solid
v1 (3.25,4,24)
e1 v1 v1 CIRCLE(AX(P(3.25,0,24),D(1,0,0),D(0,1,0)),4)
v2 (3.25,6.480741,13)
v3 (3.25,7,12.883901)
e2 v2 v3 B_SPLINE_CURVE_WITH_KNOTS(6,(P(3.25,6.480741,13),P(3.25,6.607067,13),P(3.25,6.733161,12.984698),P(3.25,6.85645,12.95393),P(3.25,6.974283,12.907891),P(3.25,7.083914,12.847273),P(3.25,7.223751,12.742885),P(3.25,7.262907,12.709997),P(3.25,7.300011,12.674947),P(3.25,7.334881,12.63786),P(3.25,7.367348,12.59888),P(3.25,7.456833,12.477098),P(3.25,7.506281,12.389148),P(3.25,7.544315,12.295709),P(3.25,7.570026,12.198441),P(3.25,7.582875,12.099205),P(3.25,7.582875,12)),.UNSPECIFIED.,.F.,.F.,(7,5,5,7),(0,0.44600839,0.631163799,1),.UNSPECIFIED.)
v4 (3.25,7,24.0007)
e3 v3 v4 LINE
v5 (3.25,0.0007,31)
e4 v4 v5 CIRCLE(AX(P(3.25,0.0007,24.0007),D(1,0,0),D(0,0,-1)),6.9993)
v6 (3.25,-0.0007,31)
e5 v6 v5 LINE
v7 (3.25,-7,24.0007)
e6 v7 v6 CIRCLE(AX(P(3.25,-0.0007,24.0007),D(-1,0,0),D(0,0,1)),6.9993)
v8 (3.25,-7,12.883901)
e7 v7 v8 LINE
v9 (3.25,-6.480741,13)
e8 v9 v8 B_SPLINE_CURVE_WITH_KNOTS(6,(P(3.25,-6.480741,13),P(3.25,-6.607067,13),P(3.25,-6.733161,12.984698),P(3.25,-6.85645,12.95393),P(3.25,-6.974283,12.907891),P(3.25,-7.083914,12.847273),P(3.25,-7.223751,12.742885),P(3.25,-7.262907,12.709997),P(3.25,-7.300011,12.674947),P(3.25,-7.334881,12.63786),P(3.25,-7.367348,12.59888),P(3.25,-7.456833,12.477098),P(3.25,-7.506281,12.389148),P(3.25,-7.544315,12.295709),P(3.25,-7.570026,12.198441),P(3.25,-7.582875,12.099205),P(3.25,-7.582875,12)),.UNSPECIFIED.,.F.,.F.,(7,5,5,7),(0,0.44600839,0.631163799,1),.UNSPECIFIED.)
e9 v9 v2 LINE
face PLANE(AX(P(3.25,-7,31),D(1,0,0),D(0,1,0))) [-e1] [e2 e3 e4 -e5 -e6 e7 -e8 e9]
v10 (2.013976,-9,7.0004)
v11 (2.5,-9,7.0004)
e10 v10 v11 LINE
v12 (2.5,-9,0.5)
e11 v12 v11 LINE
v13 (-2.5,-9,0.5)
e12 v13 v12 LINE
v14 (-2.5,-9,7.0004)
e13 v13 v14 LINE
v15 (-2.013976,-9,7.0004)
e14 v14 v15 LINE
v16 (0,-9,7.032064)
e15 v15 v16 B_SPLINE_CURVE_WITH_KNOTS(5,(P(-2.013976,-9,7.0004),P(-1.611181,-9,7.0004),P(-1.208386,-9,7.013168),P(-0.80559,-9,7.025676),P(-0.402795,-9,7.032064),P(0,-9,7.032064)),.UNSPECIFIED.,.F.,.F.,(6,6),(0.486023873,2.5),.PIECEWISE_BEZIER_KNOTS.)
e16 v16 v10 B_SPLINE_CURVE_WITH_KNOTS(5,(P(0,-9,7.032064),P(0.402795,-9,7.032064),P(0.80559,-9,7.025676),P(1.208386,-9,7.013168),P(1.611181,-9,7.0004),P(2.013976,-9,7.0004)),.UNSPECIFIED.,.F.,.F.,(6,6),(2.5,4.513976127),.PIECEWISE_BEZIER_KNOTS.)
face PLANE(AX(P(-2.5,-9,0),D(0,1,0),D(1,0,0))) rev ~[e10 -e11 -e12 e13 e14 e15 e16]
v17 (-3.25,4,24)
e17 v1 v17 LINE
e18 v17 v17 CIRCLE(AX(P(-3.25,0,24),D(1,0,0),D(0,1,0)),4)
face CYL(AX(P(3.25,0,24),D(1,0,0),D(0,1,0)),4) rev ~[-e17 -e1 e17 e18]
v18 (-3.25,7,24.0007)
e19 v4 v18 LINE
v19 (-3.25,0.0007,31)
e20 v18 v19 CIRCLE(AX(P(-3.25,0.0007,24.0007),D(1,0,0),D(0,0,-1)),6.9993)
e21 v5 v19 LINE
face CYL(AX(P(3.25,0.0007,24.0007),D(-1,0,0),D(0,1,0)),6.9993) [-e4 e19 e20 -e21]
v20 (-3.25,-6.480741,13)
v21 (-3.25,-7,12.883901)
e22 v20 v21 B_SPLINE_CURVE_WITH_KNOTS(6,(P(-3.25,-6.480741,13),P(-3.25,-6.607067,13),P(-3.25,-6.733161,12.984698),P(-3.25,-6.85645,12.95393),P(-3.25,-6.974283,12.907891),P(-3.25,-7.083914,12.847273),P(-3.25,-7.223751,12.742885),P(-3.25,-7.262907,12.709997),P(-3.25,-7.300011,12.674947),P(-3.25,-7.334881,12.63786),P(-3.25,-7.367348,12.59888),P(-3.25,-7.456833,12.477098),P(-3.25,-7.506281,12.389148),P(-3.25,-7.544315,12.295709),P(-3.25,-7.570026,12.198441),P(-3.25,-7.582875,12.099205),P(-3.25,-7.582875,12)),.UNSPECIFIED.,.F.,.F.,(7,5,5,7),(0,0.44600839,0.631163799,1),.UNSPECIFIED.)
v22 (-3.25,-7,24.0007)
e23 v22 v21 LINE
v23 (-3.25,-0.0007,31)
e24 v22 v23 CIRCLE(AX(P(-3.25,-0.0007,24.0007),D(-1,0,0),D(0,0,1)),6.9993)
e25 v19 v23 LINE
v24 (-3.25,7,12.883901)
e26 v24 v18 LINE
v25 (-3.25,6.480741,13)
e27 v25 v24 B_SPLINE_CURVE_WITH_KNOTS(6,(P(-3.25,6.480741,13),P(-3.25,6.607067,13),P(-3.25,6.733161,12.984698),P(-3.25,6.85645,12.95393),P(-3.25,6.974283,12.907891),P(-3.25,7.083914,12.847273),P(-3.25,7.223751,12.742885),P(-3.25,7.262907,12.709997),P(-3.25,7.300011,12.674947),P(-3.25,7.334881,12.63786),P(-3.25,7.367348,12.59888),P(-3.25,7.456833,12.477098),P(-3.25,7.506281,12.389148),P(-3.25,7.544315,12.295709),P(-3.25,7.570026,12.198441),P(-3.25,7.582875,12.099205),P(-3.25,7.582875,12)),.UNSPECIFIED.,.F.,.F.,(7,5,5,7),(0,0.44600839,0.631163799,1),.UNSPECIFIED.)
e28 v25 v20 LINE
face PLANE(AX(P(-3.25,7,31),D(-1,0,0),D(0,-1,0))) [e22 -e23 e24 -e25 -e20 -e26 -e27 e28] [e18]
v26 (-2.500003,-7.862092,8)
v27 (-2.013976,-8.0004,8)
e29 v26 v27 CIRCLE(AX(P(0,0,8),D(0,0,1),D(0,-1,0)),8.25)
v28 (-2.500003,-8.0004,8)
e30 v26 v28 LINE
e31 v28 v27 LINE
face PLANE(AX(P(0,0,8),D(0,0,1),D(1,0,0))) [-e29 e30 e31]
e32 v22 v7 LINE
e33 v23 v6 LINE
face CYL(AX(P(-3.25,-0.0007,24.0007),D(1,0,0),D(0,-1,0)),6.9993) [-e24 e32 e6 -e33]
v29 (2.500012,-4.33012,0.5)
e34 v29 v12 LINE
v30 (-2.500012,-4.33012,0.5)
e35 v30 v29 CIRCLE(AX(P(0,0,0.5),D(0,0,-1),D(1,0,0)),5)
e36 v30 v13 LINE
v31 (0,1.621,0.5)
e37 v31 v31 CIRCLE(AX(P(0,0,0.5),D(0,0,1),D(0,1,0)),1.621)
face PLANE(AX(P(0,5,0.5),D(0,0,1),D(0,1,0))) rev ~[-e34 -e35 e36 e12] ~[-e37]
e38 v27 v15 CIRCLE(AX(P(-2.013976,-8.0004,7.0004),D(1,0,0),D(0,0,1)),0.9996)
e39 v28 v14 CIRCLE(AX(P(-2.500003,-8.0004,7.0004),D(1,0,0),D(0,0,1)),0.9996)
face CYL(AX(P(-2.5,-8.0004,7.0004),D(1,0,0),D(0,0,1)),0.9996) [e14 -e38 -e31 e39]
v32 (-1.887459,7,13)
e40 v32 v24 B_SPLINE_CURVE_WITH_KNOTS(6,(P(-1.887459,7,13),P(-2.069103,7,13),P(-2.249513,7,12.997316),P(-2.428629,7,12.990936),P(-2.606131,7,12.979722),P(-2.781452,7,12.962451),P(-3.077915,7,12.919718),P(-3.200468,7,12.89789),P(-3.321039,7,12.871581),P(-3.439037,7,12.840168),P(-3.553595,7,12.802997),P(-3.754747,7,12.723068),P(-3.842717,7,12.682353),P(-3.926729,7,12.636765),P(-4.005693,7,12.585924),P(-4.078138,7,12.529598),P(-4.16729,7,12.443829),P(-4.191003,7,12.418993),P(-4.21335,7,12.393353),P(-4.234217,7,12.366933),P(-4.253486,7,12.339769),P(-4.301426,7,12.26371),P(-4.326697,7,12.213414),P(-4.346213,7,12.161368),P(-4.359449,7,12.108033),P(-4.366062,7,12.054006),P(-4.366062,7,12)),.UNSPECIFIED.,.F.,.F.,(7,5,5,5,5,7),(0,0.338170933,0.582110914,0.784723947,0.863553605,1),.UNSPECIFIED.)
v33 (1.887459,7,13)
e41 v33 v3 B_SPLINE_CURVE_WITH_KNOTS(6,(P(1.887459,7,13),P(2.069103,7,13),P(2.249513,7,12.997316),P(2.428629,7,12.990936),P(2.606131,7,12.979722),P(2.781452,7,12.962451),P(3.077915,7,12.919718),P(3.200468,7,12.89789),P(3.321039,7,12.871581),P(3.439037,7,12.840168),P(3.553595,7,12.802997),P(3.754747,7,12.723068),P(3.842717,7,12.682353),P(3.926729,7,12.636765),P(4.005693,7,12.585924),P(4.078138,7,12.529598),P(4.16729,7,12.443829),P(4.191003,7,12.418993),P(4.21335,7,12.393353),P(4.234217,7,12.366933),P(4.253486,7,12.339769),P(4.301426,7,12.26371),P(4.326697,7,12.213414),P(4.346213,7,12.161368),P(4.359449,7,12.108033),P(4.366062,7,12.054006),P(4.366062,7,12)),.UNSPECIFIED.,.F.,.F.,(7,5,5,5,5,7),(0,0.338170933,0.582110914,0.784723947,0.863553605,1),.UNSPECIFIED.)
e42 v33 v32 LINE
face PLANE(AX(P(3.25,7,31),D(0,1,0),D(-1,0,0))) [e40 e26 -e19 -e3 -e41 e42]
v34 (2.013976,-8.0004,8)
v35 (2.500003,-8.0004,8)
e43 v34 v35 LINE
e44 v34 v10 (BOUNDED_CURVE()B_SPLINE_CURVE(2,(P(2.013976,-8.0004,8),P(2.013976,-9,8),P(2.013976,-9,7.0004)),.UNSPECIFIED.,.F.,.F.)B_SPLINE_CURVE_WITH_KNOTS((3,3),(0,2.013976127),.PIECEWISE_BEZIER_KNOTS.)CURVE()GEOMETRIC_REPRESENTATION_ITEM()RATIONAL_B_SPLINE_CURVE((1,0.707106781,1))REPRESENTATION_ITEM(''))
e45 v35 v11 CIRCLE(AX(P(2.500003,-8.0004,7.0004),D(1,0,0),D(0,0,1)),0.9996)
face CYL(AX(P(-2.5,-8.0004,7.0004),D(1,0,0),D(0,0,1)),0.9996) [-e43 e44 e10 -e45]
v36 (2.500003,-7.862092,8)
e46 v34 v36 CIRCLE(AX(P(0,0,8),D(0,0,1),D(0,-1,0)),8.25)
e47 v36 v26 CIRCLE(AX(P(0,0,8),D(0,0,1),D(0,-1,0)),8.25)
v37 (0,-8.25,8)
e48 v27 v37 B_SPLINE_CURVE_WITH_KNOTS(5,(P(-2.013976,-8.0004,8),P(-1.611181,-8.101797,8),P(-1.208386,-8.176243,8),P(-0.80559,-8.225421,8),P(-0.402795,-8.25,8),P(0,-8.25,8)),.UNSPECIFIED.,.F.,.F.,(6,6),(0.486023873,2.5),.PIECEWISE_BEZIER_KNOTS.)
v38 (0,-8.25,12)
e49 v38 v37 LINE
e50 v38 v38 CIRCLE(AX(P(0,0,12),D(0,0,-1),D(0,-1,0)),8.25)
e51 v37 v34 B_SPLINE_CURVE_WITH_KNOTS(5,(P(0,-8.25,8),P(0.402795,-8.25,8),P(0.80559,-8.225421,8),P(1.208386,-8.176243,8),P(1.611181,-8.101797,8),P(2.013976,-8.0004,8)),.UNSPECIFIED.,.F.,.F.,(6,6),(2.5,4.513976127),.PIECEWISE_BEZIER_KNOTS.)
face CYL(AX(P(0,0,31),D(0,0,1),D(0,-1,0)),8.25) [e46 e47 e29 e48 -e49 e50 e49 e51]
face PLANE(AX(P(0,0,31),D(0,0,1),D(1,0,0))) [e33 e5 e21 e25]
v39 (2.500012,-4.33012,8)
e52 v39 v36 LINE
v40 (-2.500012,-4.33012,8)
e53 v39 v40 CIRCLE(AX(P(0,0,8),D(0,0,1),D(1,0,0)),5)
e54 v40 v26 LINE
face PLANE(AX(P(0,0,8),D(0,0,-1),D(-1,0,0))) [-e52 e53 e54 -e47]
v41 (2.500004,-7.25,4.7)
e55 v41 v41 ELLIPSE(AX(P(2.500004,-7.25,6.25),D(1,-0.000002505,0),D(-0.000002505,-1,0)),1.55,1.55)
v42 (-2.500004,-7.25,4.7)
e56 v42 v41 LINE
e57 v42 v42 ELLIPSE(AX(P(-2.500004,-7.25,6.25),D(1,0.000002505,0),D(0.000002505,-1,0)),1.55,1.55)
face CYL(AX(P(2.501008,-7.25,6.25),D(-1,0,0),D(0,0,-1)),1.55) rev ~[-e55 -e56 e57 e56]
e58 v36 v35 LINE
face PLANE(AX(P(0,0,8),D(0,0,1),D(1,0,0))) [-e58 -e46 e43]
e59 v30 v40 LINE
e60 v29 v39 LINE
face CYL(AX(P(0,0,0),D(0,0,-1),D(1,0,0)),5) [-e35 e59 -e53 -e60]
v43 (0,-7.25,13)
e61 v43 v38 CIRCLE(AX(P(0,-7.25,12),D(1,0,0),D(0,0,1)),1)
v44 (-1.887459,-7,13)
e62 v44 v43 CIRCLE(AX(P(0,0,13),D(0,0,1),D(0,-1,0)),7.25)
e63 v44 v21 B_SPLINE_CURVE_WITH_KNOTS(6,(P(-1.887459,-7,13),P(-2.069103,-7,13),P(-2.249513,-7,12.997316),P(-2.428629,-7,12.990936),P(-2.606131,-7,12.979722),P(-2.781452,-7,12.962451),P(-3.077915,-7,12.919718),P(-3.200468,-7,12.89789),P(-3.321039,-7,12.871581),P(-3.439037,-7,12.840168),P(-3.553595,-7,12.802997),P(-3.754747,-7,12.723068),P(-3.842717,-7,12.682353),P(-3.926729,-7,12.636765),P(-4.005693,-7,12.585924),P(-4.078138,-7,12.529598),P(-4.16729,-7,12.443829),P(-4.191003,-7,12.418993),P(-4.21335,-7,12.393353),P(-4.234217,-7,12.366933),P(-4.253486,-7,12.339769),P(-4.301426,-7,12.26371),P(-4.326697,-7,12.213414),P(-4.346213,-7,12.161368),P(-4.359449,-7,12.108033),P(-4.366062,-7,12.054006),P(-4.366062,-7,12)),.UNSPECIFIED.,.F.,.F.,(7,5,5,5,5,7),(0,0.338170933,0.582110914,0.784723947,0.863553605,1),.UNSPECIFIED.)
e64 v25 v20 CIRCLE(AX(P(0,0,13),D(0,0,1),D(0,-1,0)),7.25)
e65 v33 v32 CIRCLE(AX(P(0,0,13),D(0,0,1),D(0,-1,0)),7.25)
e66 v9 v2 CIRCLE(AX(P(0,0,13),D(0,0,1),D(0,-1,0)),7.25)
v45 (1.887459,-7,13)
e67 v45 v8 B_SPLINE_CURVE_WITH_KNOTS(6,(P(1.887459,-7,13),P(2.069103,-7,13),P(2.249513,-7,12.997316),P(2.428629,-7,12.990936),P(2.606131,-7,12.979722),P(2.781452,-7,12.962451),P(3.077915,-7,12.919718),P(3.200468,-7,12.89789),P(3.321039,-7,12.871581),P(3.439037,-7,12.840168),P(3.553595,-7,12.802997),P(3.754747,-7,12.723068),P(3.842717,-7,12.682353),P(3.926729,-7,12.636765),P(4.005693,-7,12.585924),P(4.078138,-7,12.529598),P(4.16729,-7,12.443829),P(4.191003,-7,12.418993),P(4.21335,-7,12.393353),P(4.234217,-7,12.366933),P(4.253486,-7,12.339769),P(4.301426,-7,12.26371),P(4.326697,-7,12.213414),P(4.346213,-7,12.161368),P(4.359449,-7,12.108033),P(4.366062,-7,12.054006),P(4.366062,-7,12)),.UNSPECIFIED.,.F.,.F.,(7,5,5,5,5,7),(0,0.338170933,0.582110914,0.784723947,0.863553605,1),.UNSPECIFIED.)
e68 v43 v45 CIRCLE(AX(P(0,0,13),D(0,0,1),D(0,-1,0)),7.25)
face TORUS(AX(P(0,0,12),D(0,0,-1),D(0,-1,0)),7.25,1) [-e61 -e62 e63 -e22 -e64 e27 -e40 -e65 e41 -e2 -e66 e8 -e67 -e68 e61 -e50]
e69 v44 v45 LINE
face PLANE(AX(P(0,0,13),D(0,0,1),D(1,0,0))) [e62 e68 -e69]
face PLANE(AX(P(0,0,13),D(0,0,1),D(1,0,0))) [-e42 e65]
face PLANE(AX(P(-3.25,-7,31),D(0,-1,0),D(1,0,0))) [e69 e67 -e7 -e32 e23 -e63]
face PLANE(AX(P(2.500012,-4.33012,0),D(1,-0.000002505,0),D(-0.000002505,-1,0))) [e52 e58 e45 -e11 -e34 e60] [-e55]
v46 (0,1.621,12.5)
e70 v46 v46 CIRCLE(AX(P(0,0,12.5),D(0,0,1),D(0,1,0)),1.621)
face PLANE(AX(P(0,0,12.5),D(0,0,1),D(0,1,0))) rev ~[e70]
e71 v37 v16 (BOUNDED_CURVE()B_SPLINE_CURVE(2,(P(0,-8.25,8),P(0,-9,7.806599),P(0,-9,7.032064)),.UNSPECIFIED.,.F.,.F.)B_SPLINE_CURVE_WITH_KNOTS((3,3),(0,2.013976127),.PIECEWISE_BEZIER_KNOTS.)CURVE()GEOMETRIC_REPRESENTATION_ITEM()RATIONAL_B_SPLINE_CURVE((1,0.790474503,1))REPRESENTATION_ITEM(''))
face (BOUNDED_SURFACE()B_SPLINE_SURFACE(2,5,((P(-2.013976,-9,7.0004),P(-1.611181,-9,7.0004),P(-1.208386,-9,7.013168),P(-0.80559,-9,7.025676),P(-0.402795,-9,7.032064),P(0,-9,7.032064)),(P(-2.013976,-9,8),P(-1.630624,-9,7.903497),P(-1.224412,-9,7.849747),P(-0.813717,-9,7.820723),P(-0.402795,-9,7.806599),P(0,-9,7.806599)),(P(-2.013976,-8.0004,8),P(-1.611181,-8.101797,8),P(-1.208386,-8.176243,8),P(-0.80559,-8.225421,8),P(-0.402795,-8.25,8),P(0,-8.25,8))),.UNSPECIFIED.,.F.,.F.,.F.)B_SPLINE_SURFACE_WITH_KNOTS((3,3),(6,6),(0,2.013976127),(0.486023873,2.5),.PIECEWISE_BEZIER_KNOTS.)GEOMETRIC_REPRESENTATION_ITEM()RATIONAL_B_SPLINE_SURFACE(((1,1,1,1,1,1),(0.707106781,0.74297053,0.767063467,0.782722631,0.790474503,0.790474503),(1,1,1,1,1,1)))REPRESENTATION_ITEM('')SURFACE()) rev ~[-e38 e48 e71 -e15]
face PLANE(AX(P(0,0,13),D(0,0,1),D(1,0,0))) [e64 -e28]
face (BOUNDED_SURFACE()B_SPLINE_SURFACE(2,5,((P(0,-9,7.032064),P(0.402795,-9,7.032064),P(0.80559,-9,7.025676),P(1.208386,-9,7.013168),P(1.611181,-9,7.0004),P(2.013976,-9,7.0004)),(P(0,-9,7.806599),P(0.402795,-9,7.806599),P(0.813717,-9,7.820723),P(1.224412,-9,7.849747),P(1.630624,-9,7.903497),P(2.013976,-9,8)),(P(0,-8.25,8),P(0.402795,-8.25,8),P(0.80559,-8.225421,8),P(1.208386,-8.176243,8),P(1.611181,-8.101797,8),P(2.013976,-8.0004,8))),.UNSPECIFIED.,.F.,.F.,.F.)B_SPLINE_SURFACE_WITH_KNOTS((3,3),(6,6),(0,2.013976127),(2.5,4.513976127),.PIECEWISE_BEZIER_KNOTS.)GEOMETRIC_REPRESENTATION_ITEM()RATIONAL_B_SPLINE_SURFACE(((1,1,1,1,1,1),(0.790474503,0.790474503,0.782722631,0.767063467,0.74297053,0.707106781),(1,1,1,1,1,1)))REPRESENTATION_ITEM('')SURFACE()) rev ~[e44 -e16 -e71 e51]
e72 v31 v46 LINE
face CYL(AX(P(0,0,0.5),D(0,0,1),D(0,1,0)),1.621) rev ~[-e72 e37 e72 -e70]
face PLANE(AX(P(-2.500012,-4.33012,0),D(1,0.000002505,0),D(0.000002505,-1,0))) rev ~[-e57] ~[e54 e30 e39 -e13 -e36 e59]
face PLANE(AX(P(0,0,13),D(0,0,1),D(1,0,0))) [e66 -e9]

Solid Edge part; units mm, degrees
sketch "Sketch1" plane through (0, 0, 0) normal (0, 0, 1) x (1, 0, 0)
  circle A0 centre (0, 0) radius 9.75
  dimension "D1" = 19.5
extrude "Protrusion1" add sketch "Sketch1" along normal blind 31
sketch "Sketch2" plane through (0, 0, 0) normal (0, 0, -1) x (1, 0, 0)
  line L0 (-2.5, 4.3301) -> (-2.5, 9)
  line L1 (-2.5, 9) -> (2.5, 9)
  line L2 (2.5, 4.3301) -> (2.5, 9)
  arc A0 (2.5, 4.3301) -> (-2.5, 4.3301) centre (0, 0) cw
extrude "Extrusionsausschnitt_1" cut sketch "Sketch2" against normal blind 8 flip side to cut
sketch "Sketch3" plane through (0, 0, 31) normal (0, 0, 1) x (0, -1, 0)
  circle A0 centre (0, 0) radius 8.25
  dimension "D1" = 16.5
extrude "Extrusionsausschnitt_2" cut sketch "Sketch3" against normal blind 23 flip side to cut
hole "Bohrung_1" at (2.5, -7.25, 6.25) direction (-1, 0, 0) diameter 3.1 end up to next
sketch "Sketch4" plane through (0, 0, 31) normal (0, 0, 1) x (0, 1, 0)
  line L0 (-7, -3.25) -> (7, -3.25)
  line L1 (7, -3.25) -> (7, 3.25)
  line L2 (7, 3.25) -> (-7, 3.25)
  line L3 (-7, 3.25) -> (-7, -3.25)
  dimension "D1" = 6.5
  dimension "D2" = 14
extrude "Extrusionsausschnitt_3" cut sketch "Sketch4" against normal blind 18 flip side to cut
fillet "Verrundung_3" radius 7 2 edges at (0, -7, 31) (0, 7, 31)
sketch "Sketch5" plane through (3.25, 0, 22) normal (1, 0, 0) x (0, 1, 0)
  circle A0 centre (0, 2) radius 4
  dimension "D1" = 8
extrude "Extrusionsausschnitt_5" cut sketch "Sketch5" against normal blind 30
fillet "Verrundung_4" radius 1 1 edges at (-8.25, 0, 13)
sketch "Sketch6" plane through (0, 0, 0) normal (1, 0, 0) x (0, 1, 0)
  line L0 (-9.424, 0.5) -> (5, 0.5)
  dimension "D1" = 0.5
extrude "Extrusionsausschnitt_6" cut sketch "Sketch6" along normal mid plane 852 material side at (0, -2.212, 0.45)
fillet "Verrundung_5" radius 1 1 edges at (0, -9, 8)
hole "Bohrung_2" at (0, 0, 0.5) direction (0, 0, 1) diameter 3.242 depth 12
